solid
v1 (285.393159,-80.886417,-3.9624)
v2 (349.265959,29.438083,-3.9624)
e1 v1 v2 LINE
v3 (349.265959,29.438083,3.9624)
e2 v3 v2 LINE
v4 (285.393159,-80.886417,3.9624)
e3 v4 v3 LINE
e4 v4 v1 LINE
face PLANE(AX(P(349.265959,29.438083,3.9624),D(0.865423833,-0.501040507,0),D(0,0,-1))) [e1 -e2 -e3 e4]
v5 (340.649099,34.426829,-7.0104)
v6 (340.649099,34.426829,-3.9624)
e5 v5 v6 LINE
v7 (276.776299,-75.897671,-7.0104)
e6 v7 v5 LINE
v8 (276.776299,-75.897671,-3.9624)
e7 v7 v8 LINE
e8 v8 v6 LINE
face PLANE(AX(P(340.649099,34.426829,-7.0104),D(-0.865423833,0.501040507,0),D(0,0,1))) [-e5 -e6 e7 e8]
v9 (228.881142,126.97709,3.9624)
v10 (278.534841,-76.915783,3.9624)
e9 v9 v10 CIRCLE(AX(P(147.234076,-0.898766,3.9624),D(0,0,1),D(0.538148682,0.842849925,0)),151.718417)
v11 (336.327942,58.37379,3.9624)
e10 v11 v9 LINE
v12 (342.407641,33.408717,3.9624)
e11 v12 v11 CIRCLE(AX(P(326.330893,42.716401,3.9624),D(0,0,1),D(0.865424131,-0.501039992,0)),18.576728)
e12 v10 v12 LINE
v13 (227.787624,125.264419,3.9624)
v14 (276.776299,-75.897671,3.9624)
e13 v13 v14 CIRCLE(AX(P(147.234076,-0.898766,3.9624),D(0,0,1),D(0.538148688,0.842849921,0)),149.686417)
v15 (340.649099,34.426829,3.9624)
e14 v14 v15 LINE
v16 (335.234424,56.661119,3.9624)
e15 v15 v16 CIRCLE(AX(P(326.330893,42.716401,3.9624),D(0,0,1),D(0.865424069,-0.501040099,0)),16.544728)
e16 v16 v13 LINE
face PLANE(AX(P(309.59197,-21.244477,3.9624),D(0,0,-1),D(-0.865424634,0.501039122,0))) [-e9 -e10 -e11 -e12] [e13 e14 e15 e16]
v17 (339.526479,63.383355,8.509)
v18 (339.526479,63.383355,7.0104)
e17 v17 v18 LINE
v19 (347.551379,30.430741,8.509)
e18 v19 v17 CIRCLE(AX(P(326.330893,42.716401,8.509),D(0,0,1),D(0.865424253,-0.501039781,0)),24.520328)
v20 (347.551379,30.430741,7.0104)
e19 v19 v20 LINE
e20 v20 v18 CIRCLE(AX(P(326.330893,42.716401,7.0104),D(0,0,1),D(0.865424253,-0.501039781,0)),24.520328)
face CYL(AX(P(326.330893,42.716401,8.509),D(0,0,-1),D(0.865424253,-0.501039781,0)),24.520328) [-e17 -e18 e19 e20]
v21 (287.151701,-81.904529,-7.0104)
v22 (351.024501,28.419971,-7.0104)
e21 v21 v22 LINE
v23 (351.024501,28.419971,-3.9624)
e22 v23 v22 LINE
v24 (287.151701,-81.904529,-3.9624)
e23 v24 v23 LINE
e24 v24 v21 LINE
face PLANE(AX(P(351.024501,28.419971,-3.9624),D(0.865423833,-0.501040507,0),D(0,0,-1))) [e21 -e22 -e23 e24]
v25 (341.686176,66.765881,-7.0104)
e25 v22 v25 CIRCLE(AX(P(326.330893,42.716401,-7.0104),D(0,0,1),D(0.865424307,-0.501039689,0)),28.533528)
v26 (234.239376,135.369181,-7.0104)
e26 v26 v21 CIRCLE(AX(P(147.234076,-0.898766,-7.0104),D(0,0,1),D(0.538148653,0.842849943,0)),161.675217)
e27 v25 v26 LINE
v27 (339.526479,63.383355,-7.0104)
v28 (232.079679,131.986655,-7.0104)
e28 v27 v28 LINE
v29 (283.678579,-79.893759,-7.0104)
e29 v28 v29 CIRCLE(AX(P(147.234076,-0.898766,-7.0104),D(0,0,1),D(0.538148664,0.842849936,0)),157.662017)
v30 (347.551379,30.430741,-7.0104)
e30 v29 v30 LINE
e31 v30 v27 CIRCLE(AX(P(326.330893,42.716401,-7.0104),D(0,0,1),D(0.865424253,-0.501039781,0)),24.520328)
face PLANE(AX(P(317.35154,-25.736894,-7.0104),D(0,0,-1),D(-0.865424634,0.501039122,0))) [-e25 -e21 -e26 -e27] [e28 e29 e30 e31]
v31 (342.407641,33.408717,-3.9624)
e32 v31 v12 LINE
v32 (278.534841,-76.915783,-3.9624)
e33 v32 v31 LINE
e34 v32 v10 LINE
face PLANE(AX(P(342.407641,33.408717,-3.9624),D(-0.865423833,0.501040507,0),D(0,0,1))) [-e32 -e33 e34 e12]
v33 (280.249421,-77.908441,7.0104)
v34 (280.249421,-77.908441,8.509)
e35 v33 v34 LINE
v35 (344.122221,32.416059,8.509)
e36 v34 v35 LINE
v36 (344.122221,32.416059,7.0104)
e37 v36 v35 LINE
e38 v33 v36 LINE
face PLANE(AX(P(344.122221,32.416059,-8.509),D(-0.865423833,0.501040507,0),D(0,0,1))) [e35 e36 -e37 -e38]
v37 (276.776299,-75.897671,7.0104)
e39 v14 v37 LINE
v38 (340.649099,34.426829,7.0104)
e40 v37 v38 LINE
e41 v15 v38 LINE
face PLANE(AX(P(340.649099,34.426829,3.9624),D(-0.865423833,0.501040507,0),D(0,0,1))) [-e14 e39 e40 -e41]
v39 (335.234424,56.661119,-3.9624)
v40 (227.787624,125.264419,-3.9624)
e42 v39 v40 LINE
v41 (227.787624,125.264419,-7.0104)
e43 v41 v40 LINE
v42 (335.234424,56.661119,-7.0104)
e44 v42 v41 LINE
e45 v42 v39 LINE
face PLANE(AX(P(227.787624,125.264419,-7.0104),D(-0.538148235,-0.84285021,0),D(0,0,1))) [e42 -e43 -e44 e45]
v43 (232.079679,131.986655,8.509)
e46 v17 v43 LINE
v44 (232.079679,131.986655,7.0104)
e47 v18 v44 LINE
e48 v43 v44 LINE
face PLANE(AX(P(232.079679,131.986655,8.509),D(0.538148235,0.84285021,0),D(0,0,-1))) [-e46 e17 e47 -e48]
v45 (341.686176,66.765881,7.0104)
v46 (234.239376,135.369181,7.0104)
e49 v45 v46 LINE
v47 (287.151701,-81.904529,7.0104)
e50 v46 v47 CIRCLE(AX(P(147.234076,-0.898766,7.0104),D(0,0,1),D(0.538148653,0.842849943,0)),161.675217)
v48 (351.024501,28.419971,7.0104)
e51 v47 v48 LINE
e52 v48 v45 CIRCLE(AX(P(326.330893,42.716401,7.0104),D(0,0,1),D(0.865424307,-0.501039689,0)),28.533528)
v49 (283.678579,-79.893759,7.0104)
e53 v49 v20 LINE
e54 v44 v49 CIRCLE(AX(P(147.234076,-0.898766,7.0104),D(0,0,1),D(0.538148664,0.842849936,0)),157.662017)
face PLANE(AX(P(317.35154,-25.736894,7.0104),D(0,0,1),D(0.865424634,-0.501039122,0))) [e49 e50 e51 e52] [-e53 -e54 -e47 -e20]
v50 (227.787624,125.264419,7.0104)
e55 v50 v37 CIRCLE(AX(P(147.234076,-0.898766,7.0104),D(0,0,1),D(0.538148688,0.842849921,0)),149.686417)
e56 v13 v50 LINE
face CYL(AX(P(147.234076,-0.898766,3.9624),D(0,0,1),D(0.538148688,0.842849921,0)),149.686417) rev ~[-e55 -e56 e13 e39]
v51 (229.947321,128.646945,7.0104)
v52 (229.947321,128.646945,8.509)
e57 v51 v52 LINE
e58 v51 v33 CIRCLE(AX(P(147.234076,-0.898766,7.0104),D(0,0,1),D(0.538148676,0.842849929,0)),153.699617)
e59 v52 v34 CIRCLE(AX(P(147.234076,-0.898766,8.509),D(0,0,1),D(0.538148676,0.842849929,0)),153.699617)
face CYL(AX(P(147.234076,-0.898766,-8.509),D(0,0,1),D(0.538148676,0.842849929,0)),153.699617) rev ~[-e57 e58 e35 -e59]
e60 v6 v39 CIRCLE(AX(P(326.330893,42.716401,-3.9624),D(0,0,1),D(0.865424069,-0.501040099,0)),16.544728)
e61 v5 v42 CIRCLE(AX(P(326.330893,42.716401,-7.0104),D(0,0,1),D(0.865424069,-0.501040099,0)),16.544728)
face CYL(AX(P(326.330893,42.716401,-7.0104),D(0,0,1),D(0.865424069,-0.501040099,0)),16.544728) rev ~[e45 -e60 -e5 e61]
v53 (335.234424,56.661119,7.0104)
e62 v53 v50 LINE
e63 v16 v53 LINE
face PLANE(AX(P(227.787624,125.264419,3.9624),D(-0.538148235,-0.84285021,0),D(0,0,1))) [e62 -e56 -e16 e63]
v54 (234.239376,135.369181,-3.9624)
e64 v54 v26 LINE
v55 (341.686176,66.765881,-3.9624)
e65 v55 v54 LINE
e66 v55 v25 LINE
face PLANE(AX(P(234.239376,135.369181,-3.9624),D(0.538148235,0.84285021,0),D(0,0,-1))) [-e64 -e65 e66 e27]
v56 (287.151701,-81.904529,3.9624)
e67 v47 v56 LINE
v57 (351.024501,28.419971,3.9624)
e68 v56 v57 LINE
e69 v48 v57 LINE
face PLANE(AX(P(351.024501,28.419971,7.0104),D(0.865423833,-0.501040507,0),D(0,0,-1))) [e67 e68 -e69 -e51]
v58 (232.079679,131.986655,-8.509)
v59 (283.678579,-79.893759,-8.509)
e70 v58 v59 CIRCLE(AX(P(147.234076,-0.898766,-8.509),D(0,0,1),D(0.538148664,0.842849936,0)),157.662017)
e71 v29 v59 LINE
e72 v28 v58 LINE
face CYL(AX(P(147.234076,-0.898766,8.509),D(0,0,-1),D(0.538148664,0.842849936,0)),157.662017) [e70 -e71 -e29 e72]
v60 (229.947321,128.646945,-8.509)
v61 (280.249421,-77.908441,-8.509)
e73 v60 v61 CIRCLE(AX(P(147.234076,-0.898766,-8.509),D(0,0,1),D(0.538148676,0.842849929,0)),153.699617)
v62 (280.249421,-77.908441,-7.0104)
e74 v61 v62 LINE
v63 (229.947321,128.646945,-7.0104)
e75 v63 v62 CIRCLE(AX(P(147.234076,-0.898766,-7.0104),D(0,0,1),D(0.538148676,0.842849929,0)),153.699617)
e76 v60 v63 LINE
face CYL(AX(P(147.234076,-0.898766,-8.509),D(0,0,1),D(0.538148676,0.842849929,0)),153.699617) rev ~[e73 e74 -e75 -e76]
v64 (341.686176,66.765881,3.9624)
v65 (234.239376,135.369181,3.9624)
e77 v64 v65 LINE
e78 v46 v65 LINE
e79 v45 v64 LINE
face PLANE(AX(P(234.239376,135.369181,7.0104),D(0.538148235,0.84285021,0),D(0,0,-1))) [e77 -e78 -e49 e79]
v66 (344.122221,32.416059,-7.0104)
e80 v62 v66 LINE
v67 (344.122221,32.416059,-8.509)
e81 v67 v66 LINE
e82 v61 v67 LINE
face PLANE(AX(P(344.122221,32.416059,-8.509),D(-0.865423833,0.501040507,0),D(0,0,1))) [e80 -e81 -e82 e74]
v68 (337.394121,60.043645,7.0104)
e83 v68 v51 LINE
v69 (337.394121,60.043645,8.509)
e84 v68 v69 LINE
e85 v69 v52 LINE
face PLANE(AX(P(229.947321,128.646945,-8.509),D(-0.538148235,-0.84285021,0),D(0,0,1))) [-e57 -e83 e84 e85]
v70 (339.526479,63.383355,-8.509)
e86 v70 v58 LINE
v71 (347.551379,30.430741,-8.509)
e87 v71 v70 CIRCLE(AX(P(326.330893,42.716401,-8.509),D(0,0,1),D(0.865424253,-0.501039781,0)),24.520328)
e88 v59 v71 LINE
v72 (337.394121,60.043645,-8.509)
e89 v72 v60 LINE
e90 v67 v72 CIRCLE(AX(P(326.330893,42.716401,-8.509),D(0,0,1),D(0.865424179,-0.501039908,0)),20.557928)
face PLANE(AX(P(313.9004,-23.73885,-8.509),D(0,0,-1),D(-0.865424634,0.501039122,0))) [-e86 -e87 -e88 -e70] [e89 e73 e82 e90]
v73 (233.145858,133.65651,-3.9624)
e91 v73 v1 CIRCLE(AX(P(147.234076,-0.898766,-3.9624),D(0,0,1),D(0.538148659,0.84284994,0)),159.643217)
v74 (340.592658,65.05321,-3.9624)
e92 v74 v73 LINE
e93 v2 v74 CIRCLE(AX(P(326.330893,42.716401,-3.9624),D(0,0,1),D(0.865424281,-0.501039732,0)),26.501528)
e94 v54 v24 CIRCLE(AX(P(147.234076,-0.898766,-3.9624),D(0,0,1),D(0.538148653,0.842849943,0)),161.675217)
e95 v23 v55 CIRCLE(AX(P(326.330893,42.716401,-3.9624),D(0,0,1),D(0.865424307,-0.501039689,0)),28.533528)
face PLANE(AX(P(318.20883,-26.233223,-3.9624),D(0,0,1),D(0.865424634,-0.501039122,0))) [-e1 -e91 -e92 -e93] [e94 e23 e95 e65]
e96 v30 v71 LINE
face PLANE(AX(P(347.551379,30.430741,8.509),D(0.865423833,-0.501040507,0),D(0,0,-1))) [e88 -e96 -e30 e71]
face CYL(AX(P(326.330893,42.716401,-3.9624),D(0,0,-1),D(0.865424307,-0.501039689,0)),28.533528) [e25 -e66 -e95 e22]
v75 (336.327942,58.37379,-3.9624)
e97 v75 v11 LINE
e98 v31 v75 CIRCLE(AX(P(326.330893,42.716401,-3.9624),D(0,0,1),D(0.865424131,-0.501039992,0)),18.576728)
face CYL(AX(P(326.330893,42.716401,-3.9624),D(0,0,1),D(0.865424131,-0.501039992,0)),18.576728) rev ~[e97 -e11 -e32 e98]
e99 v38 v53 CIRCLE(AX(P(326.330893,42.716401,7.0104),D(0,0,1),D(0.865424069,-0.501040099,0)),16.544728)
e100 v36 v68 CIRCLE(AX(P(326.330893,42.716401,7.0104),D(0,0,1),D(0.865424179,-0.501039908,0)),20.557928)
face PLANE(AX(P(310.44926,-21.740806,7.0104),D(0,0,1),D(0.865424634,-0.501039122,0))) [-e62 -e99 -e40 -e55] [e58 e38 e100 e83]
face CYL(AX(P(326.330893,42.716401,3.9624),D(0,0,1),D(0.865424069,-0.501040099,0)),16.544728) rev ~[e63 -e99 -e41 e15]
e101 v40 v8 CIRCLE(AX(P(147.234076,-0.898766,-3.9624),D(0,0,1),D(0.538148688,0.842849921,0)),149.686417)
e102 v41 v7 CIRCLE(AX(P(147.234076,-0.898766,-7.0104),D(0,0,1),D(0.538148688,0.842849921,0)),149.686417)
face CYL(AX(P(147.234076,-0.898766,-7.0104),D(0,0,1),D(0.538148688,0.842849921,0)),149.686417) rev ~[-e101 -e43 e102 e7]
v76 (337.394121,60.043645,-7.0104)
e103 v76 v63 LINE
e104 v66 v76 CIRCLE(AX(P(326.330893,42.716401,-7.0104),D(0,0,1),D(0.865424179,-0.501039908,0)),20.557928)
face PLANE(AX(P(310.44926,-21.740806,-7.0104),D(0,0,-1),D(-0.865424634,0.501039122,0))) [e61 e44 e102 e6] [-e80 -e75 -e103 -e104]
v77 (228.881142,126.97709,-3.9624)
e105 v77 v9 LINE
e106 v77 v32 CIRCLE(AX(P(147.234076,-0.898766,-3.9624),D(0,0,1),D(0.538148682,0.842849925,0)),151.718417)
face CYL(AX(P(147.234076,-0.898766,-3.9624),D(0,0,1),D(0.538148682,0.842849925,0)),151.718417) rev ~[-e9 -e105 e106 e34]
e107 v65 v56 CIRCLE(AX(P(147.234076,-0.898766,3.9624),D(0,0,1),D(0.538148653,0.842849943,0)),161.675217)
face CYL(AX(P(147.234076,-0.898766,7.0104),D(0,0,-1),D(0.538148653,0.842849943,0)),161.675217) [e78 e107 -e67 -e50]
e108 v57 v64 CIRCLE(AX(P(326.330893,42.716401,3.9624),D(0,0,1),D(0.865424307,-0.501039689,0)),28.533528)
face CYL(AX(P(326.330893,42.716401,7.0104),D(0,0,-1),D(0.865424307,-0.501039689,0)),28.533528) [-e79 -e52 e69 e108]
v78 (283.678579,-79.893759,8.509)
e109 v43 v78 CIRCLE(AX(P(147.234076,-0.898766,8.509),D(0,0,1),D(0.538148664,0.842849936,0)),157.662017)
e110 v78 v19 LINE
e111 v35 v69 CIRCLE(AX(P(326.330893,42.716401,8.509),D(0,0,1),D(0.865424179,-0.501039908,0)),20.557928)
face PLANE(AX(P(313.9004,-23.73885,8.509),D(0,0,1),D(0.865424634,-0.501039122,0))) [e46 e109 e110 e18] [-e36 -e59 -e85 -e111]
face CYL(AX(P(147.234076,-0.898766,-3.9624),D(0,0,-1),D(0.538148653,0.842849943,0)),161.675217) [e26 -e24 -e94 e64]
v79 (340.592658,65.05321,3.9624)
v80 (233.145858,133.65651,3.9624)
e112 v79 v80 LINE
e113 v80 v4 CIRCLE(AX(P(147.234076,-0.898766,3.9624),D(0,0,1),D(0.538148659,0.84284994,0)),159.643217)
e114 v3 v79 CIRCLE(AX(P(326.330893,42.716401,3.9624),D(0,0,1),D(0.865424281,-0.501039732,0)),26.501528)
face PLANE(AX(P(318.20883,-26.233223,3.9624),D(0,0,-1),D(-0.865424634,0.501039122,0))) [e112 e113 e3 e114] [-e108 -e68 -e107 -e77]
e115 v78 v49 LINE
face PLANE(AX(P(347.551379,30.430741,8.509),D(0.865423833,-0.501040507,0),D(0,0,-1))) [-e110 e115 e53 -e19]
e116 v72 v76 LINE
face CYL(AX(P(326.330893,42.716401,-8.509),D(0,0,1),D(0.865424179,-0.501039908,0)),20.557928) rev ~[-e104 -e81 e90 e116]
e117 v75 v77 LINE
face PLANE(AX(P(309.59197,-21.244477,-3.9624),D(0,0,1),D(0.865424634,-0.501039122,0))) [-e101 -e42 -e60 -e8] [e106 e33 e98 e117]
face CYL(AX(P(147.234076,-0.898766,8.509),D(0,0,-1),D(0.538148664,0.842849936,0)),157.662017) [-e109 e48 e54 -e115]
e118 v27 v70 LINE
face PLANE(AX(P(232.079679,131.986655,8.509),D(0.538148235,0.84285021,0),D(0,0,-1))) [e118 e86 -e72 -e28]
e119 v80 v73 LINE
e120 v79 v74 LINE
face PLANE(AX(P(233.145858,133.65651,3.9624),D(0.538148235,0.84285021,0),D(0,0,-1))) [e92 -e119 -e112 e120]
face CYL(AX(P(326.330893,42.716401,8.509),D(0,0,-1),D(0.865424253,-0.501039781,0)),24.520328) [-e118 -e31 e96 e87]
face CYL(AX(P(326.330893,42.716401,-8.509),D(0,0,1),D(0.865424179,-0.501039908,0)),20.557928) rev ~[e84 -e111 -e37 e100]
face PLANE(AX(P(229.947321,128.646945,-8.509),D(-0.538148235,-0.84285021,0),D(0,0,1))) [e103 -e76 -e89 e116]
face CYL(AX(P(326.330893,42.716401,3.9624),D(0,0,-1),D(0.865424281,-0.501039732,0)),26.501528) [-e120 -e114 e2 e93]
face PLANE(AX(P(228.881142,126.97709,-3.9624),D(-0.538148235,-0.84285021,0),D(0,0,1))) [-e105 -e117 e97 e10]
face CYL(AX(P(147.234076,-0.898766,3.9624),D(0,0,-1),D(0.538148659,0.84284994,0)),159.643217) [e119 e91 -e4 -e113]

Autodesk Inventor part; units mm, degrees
ref_plane "Work Plane2" through (326.3309, 42.7164, 0) normal (-1, 0, 0) x (0, 0, 1)
ref_plane "Work Plane3" through (147.2341, -0.8988, 0) normal (0.521539, 0.8532274, 0) x (0, 0, 1)
sketch "Path" plane through (0, 0, 0) normal (0, 0, 1) x (1, 0, 0)
  arc A0 (345.8368, 31.4234) -> (338.4603, 61.7135) centre (326.3309, 42.7164) ccw
  arc A1 (231.0135, 130.3168) -> (281.964, -78.9011) centre (147.2341, -0.8988) ccw
  line L0 (231.0135, 130.3168) -> (338.4603, 61.7135)
  line L1 (345.8368, 31.4234) -> (281.964, -78.9011)
  dimension "d31" = 11.9888
ref_plane "Section Plane" through (338.4603, 61.7135, 0) normal (-0.8428502, 0.5381482, 0) x (0, 0, 1)
sketch "Section Sketch" plane through (338.4603, 61.7135, 0) normal (-0.8428502, 0.5381482, 0) x (0, 0, 1)
  line L0 (-8.509, -1.9812) -> (8.509, -1.9812)
  line L1 (8.509, -1.9812) -> (8.509, 1.9812)
  line L2 (8.509, 1.9812) -> (-8.509, 1.9812)
  line L3 (-8.509, 1.9812) -> (-8.509, -1.9812)
  line L4 (-3.9624, -3.9624) -> (3.9624, -3.9624)
  line L5 (3.9624, -3.9624) -> (3.9624, 3.9624)
  line L6 (3.9624, 3.9624) -> (-3.9624, 3.9624)
  line L7 (-3.9624, 3.9624) -> (-3.9624, -3.9624)
  line L8 (-3.9624, 0) -> (3.9624, 0) construction
  line L9 (-7.0104, -5.9944) -> (-3.9624, -5.9944)
  line L10 (-3.9624, -5.9944) -> (-3.9624, 5.9944)
  line L11 (-3.9624, 5.9944) -> (-7.0104, 5.9944)
  line L12 (-7.0104, 5.9944) -> (-7.0104, -5.9944)
  line L13 (3.9624, -5.9944) -> (7.0104, -5.9944)
  line L14 (7.0104, -5.9944) -> (7.0104, 5.9944)
  line L15 (7.0104, 5.9944) -> (3.9624, 5.9944)
  line L16 (3.9624, 5.9944) -> (3.9624, -5.9944)
  line L17 (-8.509, 0) -> (8.509, 0) construction
  point P0 (0, 0)
  point P1 (0, 0)
  dimension "d21" = 3.9624
  dimension "d22" = 7.9248
  dimension "d23" = 7.9248
  dimension "d24" = 3.048
  dimension "d31" = 11.9888
  dimension "d32" = 17.018
sweep "Solid" add profiles "Section Sketch" path "Path"
pattern_of_one "Strand Pattern"
equation "\"d21\" = da_d2"
equation "\"d22\" = da_d1"
equation "\"d23\" = da_b1"
equation "\"d24\" = da_t1 + da_t2"
equation "\"d30\" = da_pt"
equation "\"da_p\" = 12.7"
equation "\"da_b1\" = 7.9248"
equation "\"da_h2\" = 11.9888"
equation "\"da_h3\" = 10.3886"
equation "\"da_d1\" = 7.9248"
equation "\"da_d2\" = 3.9624"
equation "\"da_pt\" = 14.3764"
equation "\"da_b\" = 17.018"
equation "\"da_t1\" = 1.524"
equation "\"da_t2\" = 1.524"
properties part number "Roller Chain"
